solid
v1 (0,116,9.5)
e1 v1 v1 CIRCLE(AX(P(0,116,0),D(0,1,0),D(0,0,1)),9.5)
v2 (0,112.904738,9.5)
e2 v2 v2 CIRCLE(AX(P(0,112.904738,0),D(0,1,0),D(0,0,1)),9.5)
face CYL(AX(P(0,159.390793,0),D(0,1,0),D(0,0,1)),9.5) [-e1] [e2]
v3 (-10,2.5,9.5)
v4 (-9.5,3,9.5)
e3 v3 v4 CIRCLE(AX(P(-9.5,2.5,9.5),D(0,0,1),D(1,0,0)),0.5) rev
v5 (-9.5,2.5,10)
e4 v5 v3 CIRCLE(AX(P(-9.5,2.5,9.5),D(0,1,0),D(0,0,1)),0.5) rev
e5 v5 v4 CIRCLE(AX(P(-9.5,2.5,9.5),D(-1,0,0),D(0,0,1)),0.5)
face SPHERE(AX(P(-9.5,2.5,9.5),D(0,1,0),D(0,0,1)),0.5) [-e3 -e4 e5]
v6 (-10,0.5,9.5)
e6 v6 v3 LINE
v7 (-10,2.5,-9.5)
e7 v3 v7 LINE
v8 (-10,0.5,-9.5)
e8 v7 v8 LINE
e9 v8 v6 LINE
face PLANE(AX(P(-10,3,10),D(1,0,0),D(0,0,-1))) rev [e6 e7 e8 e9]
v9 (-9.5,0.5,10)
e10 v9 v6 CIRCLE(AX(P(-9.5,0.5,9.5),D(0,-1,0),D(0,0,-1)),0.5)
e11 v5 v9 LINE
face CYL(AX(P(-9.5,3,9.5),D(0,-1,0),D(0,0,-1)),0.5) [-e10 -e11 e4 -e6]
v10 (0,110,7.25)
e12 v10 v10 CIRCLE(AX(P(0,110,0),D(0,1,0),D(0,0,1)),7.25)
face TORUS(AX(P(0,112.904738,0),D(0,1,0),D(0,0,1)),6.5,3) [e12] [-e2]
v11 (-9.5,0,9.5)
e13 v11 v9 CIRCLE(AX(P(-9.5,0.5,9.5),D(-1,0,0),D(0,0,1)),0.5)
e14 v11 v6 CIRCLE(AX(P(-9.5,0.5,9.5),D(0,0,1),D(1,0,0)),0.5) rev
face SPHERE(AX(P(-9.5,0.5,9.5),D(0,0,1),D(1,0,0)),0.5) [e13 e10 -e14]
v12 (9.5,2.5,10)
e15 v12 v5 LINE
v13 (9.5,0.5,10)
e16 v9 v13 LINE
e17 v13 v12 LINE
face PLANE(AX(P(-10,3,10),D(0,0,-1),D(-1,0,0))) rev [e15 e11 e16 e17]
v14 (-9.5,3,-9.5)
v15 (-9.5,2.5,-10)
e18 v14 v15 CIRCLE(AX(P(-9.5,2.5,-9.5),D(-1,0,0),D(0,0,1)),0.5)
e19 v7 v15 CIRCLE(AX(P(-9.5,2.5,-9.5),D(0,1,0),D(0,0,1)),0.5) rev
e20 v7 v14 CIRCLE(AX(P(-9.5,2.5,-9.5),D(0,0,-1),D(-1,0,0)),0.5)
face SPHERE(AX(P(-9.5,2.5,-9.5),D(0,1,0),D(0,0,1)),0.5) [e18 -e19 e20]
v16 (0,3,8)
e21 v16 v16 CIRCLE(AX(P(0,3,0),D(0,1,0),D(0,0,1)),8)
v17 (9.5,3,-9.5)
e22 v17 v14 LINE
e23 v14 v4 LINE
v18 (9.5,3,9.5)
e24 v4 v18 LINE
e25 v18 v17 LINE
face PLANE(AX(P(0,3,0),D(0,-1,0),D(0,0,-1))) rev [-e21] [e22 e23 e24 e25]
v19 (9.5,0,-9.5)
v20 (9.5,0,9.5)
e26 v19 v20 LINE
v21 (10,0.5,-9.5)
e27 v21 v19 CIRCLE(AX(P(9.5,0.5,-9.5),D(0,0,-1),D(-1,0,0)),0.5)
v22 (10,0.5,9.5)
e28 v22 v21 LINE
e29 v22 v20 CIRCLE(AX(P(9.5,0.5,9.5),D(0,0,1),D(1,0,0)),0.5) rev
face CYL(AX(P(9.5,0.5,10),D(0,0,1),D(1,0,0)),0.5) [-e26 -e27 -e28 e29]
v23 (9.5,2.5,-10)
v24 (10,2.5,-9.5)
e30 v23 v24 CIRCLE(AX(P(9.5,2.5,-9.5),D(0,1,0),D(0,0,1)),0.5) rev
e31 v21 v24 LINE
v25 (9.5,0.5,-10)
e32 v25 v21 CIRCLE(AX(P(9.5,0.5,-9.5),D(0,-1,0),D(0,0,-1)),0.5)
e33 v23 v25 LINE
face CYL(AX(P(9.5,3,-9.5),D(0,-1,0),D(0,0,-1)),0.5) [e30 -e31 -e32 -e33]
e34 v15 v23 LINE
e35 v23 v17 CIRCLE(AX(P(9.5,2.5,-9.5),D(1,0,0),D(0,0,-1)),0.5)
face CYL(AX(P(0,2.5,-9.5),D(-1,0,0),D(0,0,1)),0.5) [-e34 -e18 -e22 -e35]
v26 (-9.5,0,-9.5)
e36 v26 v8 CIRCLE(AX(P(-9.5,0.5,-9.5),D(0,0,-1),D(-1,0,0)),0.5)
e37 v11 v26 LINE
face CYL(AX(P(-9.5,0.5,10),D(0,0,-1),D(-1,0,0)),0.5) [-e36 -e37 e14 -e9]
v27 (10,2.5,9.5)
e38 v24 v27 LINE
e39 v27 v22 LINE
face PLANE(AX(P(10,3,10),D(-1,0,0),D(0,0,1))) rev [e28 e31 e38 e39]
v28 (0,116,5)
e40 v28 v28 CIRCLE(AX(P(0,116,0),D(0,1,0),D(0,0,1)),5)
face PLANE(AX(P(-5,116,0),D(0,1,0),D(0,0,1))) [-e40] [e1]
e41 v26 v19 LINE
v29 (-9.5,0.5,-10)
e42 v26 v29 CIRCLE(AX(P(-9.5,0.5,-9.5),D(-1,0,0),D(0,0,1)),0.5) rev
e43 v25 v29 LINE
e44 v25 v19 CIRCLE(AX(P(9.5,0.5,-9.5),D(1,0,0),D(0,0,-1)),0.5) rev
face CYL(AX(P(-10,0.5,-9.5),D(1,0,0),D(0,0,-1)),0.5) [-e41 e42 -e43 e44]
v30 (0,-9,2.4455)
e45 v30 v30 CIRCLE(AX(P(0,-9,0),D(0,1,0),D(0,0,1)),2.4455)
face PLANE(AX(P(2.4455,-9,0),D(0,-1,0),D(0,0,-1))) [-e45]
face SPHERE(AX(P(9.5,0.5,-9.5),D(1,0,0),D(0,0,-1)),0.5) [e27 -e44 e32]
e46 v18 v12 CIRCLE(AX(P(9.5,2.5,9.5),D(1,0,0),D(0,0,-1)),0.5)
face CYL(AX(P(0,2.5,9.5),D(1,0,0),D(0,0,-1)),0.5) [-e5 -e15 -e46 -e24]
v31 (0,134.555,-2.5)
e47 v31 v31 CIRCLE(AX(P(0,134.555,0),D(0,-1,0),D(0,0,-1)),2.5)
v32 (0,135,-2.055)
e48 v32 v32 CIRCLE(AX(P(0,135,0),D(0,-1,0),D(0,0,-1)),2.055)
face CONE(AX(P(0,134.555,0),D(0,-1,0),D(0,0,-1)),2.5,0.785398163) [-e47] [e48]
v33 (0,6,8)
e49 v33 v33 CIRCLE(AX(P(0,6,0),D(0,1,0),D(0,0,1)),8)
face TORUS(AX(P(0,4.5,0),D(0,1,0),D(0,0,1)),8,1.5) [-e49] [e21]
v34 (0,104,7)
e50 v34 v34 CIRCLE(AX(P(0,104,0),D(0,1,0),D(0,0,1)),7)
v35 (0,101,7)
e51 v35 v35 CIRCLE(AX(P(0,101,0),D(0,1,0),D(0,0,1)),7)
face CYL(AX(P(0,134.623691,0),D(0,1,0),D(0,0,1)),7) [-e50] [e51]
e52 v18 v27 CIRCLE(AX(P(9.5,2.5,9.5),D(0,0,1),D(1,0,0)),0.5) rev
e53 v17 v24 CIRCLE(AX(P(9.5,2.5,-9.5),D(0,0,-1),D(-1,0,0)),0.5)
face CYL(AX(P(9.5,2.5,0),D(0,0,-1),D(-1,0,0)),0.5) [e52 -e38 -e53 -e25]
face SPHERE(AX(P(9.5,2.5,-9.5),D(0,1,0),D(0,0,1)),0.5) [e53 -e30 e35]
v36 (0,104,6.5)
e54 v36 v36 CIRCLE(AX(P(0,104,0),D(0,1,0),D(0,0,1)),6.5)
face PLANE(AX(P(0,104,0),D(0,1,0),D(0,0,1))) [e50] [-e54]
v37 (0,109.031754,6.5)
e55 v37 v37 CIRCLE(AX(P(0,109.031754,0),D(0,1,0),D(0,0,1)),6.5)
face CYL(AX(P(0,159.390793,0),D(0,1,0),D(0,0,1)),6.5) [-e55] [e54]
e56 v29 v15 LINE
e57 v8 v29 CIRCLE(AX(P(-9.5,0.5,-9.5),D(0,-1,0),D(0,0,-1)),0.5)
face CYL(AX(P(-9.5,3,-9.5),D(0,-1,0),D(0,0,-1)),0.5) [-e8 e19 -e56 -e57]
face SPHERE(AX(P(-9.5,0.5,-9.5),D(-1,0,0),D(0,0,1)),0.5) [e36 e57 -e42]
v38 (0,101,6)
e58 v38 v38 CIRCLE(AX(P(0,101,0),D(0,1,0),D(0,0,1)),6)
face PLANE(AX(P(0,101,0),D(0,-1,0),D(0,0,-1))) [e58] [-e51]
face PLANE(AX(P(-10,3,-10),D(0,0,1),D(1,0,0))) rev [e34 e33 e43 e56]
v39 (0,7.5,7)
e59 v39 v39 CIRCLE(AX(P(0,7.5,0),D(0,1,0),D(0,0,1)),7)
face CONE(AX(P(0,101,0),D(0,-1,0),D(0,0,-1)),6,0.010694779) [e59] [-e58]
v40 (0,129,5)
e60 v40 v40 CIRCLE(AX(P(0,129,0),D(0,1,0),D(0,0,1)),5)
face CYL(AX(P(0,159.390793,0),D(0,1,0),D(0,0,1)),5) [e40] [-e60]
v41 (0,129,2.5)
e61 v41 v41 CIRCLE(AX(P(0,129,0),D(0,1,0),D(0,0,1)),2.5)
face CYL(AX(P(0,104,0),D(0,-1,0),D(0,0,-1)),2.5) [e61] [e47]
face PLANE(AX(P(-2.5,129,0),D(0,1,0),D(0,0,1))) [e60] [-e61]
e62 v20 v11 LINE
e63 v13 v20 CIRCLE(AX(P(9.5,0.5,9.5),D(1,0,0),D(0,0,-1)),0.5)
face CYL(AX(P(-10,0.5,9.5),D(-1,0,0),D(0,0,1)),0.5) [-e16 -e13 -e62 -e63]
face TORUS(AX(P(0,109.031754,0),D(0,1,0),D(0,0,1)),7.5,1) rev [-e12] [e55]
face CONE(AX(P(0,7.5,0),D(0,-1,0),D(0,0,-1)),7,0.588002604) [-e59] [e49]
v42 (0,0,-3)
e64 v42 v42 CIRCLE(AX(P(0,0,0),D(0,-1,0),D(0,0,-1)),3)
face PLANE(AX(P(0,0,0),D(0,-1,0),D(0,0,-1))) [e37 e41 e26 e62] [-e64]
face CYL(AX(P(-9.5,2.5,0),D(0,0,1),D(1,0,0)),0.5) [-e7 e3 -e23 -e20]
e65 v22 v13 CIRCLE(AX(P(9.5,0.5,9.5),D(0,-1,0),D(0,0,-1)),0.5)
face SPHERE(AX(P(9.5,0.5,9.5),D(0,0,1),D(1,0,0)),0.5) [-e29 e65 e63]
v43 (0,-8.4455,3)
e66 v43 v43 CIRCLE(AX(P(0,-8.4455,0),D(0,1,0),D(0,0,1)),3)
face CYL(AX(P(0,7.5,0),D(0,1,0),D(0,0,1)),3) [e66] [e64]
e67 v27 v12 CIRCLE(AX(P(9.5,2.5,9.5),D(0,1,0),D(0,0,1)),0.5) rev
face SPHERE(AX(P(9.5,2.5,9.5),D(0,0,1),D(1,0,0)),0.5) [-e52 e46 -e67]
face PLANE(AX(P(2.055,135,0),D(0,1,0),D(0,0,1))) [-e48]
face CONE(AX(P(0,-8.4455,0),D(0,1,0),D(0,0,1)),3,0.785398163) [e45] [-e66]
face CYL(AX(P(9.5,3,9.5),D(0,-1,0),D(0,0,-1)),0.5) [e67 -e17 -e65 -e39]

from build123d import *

# Parameters (mm, degrees)
SKETCH1_W           = 20
SKETCH1_H           = 20
SKETCH1_R           = 3
BOSS_EXTRUDE1_DEPTH = 3
FILLET1_R           = 0.5


# Read off the part's stored shape, not the designer's step: M6x1.0 Machine Threads Stud1, M5x0.8 Machine Threads Stud1
with BuildPart() as part:
    # Sketch1 → Boss-Extrude1 (new body)
    with BuildSketch(Plane(origin=(0, 0, 0), x_dir=(1, 0, 0), z_dir=(0, 1, 0))):
        Rectangle(SKETCH1_W, SKETCH1_H)
        with Locations(Location((0, 0, 0), (0, 0, 270))):
            Circle(SKETCH1_R, mode=Mode.SUBTRACT)
    extrude(amount=BOSS_EXTRUDE1_DEPTH)

    # Sketch2 → Revolve1 (revolve)
    with BuildSketch(Plane.XY, mode=Mode.PRIVATE) as revolve1_sk:
        with BuildLine():
            Line((-3, 7.5), (-7, 7.5))
            Line((-7, 7.5), (-8, 6))
            ThreePointArc((-8, 6), (-9.499999777, 4.499999889), (-7.999999777, 3))
            Line((-7.999999777, 3), (-3, 3))
            Line((-3, 3), (-3, 7.5))
        make_face()
    revolve(revolve1_sk.sketch.rotate(Axis((0, 13.88184313, 0), (0, -1, 0)), 270), axis=Axis((0, 13.88184313, 0), (0, -1, 0)))

    # Sketch3 → Revolve2 (revolve)
    with BuildSketch(Plane.XY, mode=Mode.PRIVATE) as revolve2_sk:
        Polygon((0, 7.5), (0, 101), (-6, 101), (-7, 7.5), align=None)
        Polygon((0, 101), (0, 104), (-7, 104), (-7, 101), (-6, 101), align=None)
    revolve(revolve2_sk.sketch.rotate(Axis((0, 134.623690835, 0), (0, -1, 0)), 270), axis=Axis((0, 134.623690835, 0), (0, -1, 0)))

    # Sketch4 → Revolve3 (revolve)
    with BuildSketch(Plane.XY, mode=Mode.PRIVATE) as revolve3_sk:
        with BuildLine():
            Line((-2.5, 129), (-5, 129))
            Line((-5, 129), (-5, 116))
            Line((-5, 116), (-9.5, 116))
            Line((-9.5, 116), (-9.5, 112.90473751))
            ThreePointArc((-9.5, 112.90473751), (-8.871708245, 111.067620203), (-7.25, 110))
            ThreePointArc((-7.25, 110), (-6.709430585, 109.644126599), (-6.5, 109.031754163))
            Line((-6.5, 109.031754163), (-6.5, 104))
            Line((-6.5, 104), (-2.5, 104))
            Line((-2.5, 104), (-2.5, 129))
        make_face()
    revolve(revolve3_sk.sketch.rotate(Axis((0, 159.390793399, 0), (0, -1, 0)), 270), axis=Axis((0, 159.390793399, 0), (0, -1, 0)))

    # Fillet1
    fillet1_edges = [part.edges().sort_by_distance(p)[0] for p in [
        (-10, 3, 0),
        (0, 3, 10),
        (10, 3, 0),
        (0, 0, 10),
        (-10, 0, 0),
        (0, 0, -10),
        (10, 0, 0),
        (10, 1.5, 10),
        (-10, 1.5, 10),
        (-10, 1.5, -10),
        (10, 1.5, -10),
        (0, 3, -10),
    ]]
    fillet(fillet1_edges, radius=FILLET1_R)

    # M6x1.0 Machine Threads Stud1 outline → M6x1.0 Machine Threads Stud1 (revolve)
    with BuildSketch(Plane.XY):
        Polygon((0, 7.5), (0, -9), (2.4455, -9), (3, -8.4455), (3, 7.5), align=None)
    revolve(axis=Axis((0, 0, 0), (0, 1, 0)))

    # M5x0.8 Machine Threads Stud1 outline → M5x0.8 Machine Threads Stud1 (revolve)
    with BuildSketch(Plane.XY):
        Polygon((2.055, 135), (0, 135), (0, 104), (2.5, 104), (2.5, 134.555), align=None)
    revolve(axis=Axis((0, 0, 0), (0, 1, 0)))


solid = part.part
